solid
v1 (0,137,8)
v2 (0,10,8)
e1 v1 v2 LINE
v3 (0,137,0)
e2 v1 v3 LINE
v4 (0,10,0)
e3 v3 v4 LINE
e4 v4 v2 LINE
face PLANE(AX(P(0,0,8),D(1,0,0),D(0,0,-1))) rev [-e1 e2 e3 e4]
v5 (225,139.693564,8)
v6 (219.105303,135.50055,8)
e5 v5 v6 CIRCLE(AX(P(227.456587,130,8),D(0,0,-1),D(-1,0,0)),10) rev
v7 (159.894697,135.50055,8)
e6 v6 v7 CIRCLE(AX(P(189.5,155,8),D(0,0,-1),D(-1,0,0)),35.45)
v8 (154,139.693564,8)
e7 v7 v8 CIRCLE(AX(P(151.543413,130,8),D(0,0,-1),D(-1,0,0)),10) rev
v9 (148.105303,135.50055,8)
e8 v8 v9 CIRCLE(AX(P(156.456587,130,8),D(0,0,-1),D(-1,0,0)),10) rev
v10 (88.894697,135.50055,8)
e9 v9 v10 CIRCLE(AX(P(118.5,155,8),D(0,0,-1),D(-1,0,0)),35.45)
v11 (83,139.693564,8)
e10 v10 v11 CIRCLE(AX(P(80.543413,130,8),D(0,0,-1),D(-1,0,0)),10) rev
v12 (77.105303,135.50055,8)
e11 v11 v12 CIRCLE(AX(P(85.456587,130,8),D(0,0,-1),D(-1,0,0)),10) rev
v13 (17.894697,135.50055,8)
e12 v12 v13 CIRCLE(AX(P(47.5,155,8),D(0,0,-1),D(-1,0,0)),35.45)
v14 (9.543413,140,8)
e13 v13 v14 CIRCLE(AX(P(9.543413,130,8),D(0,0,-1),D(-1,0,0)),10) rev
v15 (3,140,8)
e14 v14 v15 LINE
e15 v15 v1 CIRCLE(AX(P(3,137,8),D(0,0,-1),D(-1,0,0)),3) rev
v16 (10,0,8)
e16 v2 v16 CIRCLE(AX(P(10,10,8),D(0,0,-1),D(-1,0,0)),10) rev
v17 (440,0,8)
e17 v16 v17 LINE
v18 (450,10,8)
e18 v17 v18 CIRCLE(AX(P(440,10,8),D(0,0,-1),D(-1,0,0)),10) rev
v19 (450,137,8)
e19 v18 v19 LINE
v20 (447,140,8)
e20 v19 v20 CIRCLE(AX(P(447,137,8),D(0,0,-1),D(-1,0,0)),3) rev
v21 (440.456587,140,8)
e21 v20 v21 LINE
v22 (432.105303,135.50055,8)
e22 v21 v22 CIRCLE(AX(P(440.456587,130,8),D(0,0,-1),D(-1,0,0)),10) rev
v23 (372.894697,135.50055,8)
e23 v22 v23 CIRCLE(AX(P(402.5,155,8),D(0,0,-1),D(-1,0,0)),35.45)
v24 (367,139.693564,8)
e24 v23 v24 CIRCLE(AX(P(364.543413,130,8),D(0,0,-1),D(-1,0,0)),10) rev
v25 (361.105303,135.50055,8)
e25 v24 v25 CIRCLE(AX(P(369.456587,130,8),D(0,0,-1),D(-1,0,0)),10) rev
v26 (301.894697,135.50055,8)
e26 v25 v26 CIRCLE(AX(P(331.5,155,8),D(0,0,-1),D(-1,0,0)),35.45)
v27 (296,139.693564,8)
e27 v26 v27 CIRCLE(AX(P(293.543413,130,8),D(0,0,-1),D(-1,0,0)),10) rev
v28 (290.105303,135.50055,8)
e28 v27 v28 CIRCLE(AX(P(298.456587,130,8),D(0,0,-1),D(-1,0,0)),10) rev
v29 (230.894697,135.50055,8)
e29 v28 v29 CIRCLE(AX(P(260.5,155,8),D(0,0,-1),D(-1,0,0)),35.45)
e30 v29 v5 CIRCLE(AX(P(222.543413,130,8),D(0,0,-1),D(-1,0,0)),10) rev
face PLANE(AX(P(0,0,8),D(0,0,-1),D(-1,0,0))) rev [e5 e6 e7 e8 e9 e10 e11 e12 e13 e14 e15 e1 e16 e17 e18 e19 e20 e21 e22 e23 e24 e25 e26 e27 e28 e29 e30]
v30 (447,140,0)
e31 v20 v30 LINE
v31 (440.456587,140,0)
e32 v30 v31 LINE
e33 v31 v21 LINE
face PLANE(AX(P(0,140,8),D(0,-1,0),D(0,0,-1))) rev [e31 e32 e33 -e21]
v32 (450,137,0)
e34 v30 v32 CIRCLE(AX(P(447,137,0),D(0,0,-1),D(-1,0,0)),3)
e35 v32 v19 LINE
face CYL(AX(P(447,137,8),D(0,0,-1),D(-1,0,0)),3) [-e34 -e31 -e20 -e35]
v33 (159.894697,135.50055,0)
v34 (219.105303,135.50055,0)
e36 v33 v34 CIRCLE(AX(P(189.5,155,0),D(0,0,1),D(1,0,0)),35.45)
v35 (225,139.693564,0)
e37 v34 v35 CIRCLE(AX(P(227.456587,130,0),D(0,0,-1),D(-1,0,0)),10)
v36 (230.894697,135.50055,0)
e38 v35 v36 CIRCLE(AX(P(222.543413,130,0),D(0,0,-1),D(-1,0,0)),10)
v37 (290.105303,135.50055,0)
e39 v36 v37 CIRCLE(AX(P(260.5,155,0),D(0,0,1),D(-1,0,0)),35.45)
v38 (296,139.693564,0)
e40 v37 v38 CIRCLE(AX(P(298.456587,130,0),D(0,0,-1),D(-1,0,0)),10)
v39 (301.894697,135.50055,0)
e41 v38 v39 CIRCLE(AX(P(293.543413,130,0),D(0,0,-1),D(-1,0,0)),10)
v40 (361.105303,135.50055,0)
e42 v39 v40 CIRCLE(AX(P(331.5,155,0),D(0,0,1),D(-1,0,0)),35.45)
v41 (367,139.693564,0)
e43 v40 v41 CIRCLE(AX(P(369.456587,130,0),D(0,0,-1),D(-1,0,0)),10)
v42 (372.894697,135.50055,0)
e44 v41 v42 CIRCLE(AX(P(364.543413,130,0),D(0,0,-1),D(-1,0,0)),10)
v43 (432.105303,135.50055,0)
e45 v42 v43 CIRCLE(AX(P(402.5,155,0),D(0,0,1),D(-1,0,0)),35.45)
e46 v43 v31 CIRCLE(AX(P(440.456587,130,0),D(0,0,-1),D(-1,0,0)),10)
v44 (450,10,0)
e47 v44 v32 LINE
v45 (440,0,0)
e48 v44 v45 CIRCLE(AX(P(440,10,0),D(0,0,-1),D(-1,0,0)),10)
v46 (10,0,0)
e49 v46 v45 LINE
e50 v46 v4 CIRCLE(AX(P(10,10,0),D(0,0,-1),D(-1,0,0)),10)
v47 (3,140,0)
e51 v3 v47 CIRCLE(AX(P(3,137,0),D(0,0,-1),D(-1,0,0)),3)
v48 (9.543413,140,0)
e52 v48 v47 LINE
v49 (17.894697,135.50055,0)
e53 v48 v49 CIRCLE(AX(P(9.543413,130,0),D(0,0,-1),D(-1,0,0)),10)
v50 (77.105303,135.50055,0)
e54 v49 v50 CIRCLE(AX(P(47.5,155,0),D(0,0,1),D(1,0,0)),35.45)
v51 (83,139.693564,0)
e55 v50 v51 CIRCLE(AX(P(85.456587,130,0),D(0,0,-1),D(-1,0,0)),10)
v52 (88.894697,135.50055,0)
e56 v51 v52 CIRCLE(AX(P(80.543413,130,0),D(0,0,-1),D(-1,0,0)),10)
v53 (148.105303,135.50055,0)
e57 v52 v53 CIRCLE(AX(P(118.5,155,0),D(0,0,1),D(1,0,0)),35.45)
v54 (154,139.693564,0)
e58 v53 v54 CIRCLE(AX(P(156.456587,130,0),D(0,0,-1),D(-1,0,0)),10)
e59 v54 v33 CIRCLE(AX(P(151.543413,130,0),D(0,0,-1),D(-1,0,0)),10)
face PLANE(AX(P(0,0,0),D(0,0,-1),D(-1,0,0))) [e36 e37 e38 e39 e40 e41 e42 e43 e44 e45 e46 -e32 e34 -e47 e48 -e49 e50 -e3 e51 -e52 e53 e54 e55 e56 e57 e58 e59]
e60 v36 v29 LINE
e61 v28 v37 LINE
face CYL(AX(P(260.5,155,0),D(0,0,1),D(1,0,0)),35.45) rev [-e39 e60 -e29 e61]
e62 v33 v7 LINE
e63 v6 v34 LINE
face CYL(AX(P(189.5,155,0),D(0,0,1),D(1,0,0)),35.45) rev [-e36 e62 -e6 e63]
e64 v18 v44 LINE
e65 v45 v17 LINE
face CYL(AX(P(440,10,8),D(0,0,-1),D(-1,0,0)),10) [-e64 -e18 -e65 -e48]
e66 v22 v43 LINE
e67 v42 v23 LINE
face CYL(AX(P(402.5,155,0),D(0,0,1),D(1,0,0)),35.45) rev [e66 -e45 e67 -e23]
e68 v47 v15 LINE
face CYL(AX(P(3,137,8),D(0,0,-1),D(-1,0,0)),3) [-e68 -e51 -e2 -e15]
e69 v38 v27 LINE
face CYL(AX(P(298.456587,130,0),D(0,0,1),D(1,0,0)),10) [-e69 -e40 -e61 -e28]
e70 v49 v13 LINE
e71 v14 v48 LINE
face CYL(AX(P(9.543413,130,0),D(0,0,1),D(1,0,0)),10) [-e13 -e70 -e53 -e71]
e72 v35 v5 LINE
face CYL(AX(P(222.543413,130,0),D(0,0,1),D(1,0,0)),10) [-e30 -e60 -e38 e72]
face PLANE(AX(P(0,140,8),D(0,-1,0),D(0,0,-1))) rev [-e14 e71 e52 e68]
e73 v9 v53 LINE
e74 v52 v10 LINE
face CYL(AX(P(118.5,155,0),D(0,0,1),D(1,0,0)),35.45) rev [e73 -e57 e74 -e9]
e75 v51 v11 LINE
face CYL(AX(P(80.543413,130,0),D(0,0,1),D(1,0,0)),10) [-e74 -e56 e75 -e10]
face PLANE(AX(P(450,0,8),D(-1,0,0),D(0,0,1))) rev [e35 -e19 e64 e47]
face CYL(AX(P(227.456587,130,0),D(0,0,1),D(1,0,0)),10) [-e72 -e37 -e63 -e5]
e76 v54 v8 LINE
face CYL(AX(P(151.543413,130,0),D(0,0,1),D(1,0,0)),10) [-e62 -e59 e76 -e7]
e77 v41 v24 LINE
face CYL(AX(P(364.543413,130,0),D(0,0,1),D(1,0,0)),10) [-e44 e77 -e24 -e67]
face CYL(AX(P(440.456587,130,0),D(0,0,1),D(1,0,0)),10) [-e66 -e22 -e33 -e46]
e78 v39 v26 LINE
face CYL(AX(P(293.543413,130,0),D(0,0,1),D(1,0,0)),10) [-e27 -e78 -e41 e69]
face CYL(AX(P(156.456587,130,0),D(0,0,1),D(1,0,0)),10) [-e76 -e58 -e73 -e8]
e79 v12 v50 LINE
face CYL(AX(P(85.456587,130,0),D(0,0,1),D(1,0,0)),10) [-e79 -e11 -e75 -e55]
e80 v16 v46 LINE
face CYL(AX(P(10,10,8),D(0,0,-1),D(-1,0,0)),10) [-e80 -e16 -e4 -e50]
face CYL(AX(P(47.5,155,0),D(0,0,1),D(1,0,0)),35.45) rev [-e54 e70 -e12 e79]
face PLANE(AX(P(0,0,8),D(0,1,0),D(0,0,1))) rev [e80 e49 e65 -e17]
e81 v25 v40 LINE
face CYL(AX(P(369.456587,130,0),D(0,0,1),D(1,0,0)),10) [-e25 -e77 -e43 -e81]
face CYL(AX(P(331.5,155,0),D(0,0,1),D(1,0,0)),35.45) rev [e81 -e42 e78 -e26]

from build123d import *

# Parameters (mm, degrees)
ESQUISSE1_W                  = 450
ESQUISSE1_H                  = 140
BOSS_EXTRU_1_DEPTH           = 8
ENL_V_MAT_EXTRU_1_DEPTH      = 472.342762753
ENL_V_MAT_EXTRU_1_DEPTH_BACK = 472.342762753
ESQUISSE2_R                  = 35.45
CONG_1_R                     = 10
CONG_2_R                     = 3


with BuildPart() as part:
    # Esquisse1 → Boss.-Extru.1 (new body)
    with BuildSketch(Plane.XY):
        with Locations((225, 70)):
            Rectangle(ESQUISSE1_W, ESQUISSE1_H)
    extrude(amount=BOSS_EXTRU_1_DEPTH)

    # Esquisse2 → Enlèv. mat.-Extru.1 (cut, two sides: drawn at the far end of the back side and taken through both)
    with BuildSketch(Plane.XY.offset(8).offset(-ENL_V_MAT_EXTRU_1_DEPTH_BACK)):
        with Locations((189.5, 155)):
            Circle(ESQUISSE2_R)
        with Locations((118.5, 155)):
            Circle(ESQUISSE2_R)
        with Locations((47.5, 155)):
            Circle(ESQUISSE2_R)
        with Locations((402.5, 155)):
            Circle(ESQUISSE2_R)
        with Locations((331.5, 155)):
            Circle(ESQUISSE2_R)
        with Locations((260.5, 155)):
            Circle(ESQUISSE2_R)
    extrude(amount=ENL_V_MAT_EXTRU_1_DEPTH + ENL_V_MAT_EXTRU_1_DEPTH_BACK, mode=Mode.SUBTRACT)

    # Congé1
    # the kernel refuses this fillet: 10 mm, written as the material it takes off along each edge
    with BuildSketch(Plane(origin=(221.620126089, 140, -14.591152386), x_dir=(-0.4878841610391912, -0.87290838316921, 0), z_dir=(0, 0, 1)), Plane(origin=(150.620126089, 140, -14.591152386), x_dir=(-0.4878841610391912, -0.87290838316921, 0), z_dir=(0, 0, 1)), Plane(origin=(79.620126089, 140, -14.591152386), x_dir=(-0.4878841610391912, -0.87290838316921, 0), z_dir=(0, 0, 1)), Plane(origin=(363.620126089, 140, -14.591152386), x_dir=(-0.48788416103919546, -0.8729083831692078, 0), z_dir=(0, 0, 1)), Plane(origin=(292.620126089, 140, -14.591152386), x_dir=(-0.48788416103919546, -0.8729083831692078, 0), z_dir=(0, 0, 1))) as cong_1_piece_1:
        with BuildLine():
            CenterArc((5.881566976, 9.973537305), CONG_1_R, 209.201608238, 56.629213342)
            Line((-2.847516856, 5.094695695), (0, 0))
            ThreePointArc((0, 0), (2.577275022, 0.093810253), (5.154550044, 0))
        make_face()
    extrude(amount=37.182304771, mode=Mode.SUBTRACT)
    with BuildSketch(Plane(origin=(157.379873911, 140, -14.591152386), x_dir=(-1, 0, 0), z_dir=(0, 0, 1)), Plane(origin=(86.379873911, 140, -14.591152386), x_dir=(-1, 0, 0), z_dir=(0, 0, 1)), Plane(origin=(15.379873911, 140, -14.591152386), x_dir=(-1, 0, 0), z_dir=(0, 0, 1)), Plane(origin=(370.379873911, 140, -14.591152386), x_dir=(-1, 0, 0), z_dir=(0, 0, 1)), Plane(origin=(299.379873911, 140, -14.591152386), x_dir=(-1, 0, 0), z_dir=(0, 0, 1)), Plane(origin=(228.379873911, 140, -14.591152386), x_dir=(-1, 0, 0), z_dir=(0, 0, 1))) as cong_1_piece_2:
        with BuildLine():
            CenterArc((5.836460954, 10), CONG_1_R, 213.370786658, 56.629213342)
            ThreePointArc((-2.514823324, 4.499449945), (-1.175523906, 2.295493509), (0, 0))
            Line((0, 0), (5.836460954, 0))
        make_face()
    extrude(amount=37.182304771, mode=Mode.SUBTRACT)
    with BuildSketch(Plane(origin=(434.620126089, 140, -14.591152386), x_dir=(1, 0, 0), z_dir=(0, 0, 1))) as cong_1_piece_3:
        with BuildLine():
            CenterArc((5.836460954, -10), CONG_1_R, 90, 56.629213342)
            ThreePointArc((-2.514823324, -4.499449945), (-1.175523906, -2.295493509), (0, 0))
            Line((0, 0), (5.836460954, 0))
        make_face()
    extrude(amount=37.182304771, mode=Mode.SUBTRACT)
    with BuildSketch(Plane(origin=(450, 0, -25), x_dir=(-1, 0, 0), z_dir=(0, 0, 1))) as cong_1_piece_4:
        with BuildLine():
            CenterArc((CONG_1_R, -CONG_1_R), CONG_1_R, 90, 90)
            Line((0, -CONG_1_R), (0, 0))
            Line((0, 0), (CONG_1_R, 0))
        make_face()
    extrude(amount=58, mode=Mode.SUBTRACT)
    with BuildSketch(Plane(origin=(0, 0, -25), x_dir=(1, 0, 0), z_dir=(0, 0, 1))) as cong_1_piece_5:
        with BuildLine():
            CenterArc((CONG_1_R, CONG_1_R), CONG_1_R, 180, 90)
            Line((0, CONG_1_R), (0, 0))
            Line((0, 0), (CONG_1_R, 0))
        make_face()
    extrude(amount=58, mode=Mode.SUBTRACT)

    # Congé2
    cong_2_edges = [part.edges().sort_by_distance(p)[0] for p in [
        (0, 140, 4),
        (450, 140, 4),
    ]]
    fillet(cong_2_edges, radius=CONG_2_R)


solid = part.part
